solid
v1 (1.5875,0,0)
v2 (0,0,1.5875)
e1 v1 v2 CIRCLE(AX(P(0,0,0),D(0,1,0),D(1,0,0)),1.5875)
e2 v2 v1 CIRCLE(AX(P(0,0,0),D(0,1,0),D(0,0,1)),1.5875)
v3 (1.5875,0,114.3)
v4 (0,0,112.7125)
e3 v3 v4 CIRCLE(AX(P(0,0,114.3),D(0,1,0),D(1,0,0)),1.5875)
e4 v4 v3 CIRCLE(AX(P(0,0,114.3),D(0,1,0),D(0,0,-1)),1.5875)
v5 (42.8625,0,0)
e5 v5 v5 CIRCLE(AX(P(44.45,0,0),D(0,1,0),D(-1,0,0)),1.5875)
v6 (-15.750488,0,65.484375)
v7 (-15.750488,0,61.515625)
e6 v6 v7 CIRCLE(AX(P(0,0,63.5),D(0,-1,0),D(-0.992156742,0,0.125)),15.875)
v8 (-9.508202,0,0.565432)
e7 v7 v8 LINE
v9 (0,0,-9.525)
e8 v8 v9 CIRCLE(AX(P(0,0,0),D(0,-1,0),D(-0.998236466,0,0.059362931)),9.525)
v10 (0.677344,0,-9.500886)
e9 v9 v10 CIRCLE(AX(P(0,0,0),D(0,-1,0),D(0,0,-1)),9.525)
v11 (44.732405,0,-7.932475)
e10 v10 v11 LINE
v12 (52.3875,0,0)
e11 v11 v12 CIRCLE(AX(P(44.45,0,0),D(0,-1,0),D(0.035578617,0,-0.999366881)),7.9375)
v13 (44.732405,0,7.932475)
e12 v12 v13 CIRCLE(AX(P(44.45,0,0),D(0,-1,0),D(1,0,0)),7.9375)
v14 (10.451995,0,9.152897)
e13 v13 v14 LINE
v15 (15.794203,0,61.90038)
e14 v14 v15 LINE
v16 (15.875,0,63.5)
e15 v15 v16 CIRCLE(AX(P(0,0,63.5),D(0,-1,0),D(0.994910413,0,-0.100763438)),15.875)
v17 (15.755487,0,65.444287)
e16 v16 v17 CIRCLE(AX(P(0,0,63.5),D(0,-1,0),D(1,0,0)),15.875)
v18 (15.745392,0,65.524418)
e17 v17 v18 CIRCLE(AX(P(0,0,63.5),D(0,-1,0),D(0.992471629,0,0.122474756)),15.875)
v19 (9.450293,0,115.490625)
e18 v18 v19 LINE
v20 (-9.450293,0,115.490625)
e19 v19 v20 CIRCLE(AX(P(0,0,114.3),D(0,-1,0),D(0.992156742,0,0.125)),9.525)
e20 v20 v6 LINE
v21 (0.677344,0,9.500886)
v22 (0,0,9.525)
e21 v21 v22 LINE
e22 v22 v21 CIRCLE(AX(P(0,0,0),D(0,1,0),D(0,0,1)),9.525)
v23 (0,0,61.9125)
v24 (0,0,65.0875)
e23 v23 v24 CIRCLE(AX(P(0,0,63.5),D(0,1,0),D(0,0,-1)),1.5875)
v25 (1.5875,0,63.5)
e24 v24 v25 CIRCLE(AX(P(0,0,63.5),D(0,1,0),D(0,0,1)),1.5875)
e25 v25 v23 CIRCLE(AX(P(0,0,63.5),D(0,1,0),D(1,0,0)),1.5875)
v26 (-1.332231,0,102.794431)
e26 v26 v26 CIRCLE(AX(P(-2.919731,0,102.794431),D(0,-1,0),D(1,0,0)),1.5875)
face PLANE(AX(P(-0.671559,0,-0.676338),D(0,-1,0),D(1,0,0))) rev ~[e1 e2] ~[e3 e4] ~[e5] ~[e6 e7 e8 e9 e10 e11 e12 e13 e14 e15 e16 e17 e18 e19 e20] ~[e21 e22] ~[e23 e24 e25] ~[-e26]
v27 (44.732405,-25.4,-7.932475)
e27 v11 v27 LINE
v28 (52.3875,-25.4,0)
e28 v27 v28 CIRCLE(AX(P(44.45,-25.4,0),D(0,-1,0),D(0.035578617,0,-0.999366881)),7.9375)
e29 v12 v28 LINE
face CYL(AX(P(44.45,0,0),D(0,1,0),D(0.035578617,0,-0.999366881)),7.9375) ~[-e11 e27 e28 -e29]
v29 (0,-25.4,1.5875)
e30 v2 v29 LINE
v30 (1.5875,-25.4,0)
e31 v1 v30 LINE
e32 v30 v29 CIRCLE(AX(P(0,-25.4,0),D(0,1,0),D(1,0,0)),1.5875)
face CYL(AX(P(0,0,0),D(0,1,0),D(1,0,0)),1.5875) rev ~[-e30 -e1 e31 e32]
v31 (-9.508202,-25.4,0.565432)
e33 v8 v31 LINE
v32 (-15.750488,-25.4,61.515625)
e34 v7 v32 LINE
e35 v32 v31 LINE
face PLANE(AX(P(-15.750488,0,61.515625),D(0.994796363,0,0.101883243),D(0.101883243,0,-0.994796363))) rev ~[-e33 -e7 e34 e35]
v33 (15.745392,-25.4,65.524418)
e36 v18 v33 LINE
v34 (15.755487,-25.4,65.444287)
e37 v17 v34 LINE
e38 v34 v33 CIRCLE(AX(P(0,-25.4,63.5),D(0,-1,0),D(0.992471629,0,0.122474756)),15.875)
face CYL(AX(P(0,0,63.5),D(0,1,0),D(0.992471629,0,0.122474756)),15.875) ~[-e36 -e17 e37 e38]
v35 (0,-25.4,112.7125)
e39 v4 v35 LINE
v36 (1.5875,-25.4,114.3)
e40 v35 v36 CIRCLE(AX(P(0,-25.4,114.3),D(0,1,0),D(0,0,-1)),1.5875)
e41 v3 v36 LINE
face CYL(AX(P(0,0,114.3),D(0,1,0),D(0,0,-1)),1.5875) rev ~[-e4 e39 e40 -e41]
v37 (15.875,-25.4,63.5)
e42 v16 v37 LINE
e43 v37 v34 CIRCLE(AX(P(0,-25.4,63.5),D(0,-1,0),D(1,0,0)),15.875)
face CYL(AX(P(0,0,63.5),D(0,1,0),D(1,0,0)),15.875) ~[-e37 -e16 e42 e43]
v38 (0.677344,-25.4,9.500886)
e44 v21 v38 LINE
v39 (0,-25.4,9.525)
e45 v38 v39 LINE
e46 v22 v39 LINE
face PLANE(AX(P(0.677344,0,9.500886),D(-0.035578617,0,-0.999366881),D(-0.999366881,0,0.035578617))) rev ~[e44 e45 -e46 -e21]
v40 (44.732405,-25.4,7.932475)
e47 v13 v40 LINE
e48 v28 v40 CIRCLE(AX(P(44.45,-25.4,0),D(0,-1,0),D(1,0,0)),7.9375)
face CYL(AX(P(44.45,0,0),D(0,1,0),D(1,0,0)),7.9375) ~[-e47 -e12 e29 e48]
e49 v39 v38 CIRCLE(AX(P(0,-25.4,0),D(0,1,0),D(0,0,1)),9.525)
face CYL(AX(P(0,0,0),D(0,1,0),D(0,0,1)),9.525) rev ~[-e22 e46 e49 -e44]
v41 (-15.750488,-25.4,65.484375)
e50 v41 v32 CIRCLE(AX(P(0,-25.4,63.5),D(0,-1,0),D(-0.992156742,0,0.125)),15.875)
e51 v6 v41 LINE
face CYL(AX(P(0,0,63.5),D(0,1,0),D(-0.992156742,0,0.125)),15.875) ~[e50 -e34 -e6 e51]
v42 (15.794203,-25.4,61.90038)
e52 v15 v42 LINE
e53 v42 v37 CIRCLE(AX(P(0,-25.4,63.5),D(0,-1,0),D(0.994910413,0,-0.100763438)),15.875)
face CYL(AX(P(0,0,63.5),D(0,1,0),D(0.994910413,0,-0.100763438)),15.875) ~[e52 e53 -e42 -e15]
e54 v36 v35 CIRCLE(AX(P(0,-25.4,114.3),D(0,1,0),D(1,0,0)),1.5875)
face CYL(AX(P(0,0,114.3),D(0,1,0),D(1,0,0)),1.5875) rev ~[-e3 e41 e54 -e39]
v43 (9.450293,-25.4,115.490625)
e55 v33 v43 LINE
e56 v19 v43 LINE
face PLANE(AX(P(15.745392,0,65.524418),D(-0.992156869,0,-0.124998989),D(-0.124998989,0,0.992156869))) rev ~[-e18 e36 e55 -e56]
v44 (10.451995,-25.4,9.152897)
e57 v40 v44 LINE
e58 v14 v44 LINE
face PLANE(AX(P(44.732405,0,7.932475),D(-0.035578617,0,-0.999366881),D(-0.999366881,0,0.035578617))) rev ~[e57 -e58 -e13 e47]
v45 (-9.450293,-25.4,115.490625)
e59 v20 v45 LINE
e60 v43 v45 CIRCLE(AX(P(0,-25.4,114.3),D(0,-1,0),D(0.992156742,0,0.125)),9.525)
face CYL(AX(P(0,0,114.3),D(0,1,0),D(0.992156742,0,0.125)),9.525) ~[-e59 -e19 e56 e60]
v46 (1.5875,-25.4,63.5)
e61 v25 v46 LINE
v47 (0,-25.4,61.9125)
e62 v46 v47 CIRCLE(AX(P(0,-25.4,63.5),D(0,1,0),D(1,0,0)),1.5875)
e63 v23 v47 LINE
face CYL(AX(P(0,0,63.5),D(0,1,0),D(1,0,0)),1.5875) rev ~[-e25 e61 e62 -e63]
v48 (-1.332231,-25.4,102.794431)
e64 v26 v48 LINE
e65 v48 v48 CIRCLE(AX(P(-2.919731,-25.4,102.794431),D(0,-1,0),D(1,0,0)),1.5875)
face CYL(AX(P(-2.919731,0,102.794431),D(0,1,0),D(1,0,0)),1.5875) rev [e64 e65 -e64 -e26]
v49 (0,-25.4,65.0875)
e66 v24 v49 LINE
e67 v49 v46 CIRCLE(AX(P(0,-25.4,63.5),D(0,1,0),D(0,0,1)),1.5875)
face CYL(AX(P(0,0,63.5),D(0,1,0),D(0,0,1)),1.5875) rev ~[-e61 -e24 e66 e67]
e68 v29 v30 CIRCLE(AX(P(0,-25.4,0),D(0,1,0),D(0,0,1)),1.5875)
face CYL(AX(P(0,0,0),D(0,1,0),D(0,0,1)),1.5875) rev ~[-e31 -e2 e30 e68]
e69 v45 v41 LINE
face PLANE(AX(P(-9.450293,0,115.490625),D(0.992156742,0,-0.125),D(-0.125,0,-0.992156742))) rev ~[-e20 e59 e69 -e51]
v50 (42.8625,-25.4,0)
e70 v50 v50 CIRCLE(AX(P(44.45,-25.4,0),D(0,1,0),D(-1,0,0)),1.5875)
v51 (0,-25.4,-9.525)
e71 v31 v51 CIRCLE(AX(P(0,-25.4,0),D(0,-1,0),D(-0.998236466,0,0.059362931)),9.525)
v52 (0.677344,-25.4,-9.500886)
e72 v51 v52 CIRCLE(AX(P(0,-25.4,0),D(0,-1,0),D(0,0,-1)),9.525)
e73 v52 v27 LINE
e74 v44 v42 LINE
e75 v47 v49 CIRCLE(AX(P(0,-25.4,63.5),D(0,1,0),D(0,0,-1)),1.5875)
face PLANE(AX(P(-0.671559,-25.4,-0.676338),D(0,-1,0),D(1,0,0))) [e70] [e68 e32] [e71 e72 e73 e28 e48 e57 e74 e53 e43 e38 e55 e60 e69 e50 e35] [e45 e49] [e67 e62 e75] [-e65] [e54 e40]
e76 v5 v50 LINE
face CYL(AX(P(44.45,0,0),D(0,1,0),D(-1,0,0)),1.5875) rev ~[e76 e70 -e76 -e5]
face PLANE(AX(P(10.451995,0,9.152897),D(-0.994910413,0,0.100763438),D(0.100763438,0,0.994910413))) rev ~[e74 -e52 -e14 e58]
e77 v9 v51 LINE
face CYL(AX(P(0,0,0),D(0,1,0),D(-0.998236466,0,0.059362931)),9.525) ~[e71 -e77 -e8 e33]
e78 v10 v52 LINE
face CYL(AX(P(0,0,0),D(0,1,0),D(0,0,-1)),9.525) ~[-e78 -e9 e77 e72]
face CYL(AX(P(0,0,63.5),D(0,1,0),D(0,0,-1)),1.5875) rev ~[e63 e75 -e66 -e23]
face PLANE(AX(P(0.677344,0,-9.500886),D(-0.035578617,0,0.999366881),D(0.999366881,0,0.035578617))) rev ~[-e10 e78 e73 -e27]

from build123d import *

# Parameters (mm, degrees)
F0_R     = 1.5875
F1_DEPTH = 25.4


# Not quite as in the source:
# - ends of sketch curves that miss each other by under 0.0002 mm in the source are joined


with BuildPart() as f1:
    # F0 (on Front) → F1 (new body)
    with BuildSketch(Plane.XZ):
        with BuildLine():
            ThreePointArc((1.5875, 0), (-1.1225320151, -1.1225320151), (0, 1.5875))
            Line((0, 1.5875), (0, 9.525))
            ThreePointArc((0, 9.525), (-6.5322234356, 6.9322205668), (-9.5082023407, 0.5654319132))
            ThreePointArc((-9.5082023407, 0.5654319132), (-6.9322205668, -6.5322234356), (0, -9.525))
            Line((0, -9.525), (0.6773435479, -9.500885786))
            ThreePointArc((0.6773435479, -9.500885786), (6.9705567315, -6.4912990883), (9.525, 0))
            Line((9.525, 0), (1.5875, 0))
        make_face()
        with BuildLine():
            ThreePointArc((-9.5082023407, 0.5654319132), (-6.5322234356, 6.9322205668), (0, 9.525))
            Line((0, 9.525), (0, 47.625))
            ThreePointArc((0, 47.625), (-10.5003255158, 51.59375), (-15.7504882737, 61.515625))
            Line((-15.7504882737, 61.515625), (-9.5082023407, 0.5654319132))
        make_face()
        with BuildLine():
            Line((0, 47.625), (0, 9.525))
            ThreePointArc((0, 9.525), (0.3388863295, 9.5189695375), (0.6773435479, 9.500885786))
            Line((0.6773435479, 9.500885786), (10.4519953809, 9.152896871))
            Line((10.4519953809, 9.152896871), (15.7942028036, 61.9003804205))
            ThreePointArc((15.7942028036, 61.9003804205), (10.644756084, 51.722700101), (0, 47.625))
        make_face()
        with BuildLine():
            Line((10.4519953809, 9.152896871), (9.525, 0))
            Line((9.525, 0), (36.5125, 0))
            ThreePointArc((36.5125, 0), (38.9380895153, 5.7116327839), (44.7324052746, 7.9324746146))
            Line((44.7324052746, 7.9324746146), (10.4519953809, 9.152896871))
        make_face()
        with BuildLine():
            Line((36.5125, 0), (9.525, 0))
            ThreePointArc((9.525, 0), (6.9705567315, -6.4912990883), (0.6773435479, -9.500885786))
            Line((0.6773435479, -9.500885786), (44.7324052746, -7.9324746146))
            ThreePointArc((44.7324052746, -7.9324746146), (38.9380895153, -5.7116327839), (36.5125, 0))
        make_face()
        with BuildLine():
            ThreePointArc((0.6773435479, 9.500885786), (6.9705567315, 6.4912990883), (9.525, 0))
            Line((9.525, 0), (10.4519953809, 9.152896871))
            Line((10.4519953809, 9.152896871), (0.6773435479, 9.500885786))
        make_face()
        with BuildLine():
            ThreePointArc((-15.7504882737, 61.515625), (-10.5003255158, 51.59375), (0, 47.625))
            Line((0, 47.625), (0, 61.9125))
            ThreePointArc((0, 61.9125), (-1.5875, 63.5), (0, 65.0875))
            Line((0, 65.0875), (0, 79.375))
            ThreePointArc((0, 79.375), (-10.5003255158, 75.40625), (-15.7504882737, 65.484375))
            ThreePointArc((-15.7504882737, 65.484375), (-15.875, 63.5), (-15.7504882737, 61.515625))
        make_face()
        with BuildLine():
            ThreePointArc((0, 79.375), (10.5154665352, 75.3928797415), (15.7554871092, 65.444286746))
            Line((15.7554871092, 65.444286746), (9.4502929642, 115.490625))
            ThreePointArc((9.4502929642, 115.490625), (9.5063048942, 114.896483242), (9.525, 114.3))
            ThreePointArc((9.525, 114.3), (6.7351920908, 107.5648079092), (0, 104.775))
            Line((0, 104.775), (0, 79.375))
        make_face()
        with BuildLine():
            Line((0, 61.9125), (0, 47.625))
            ThreePointArc((0, 47.625), (10.644756084, 51.722700101), (15.7942028036, 61.9003804205))
            ThreePointArc((15.7942028036, 61.9003804205), (15.8547878338, 62.6991705884), (15.875, 63.5))
            ThreePointArc((15.875, 63.5), (15.8450936075, 64.4739782187), (15.7554871092, 65.444286746))
            ThreePointArc((15.7554871092, 65.444286746), (10.5154665352, 75.3928797415), (0, 79.375))
            Line((0, 79.375), (0, 65.0875))
            ThreePointArc((0, 65.0875), (1.1225320151, 64.6225320151), (1.5875, 63.5))
            ThreePointArc((1.5875, 63.5), (1.1225320151, 62.3774679849), (0, 61.9125))
        make_face()
        with BuildLine():
            ThreePointArc((44.7324052746, 7.9324746146), (38.9380895153, 5.7116327839), (36.5125, 0))
            ThreePointArc((36.5125, 0), (38.9380895153, -5.7116327839), (44.7324052746, -7.9324746146))
            ThreePointArc((44.7324052746, -7.9324746146), (50.1616327839, -5.5119104847), (52.3875, 0))
            ThreePointArc((52.3875, 0), (50.1616327839, 5.5119104847), (44.7324052746, 7.9324746146))
        make_face()
        with BuildLine():
            ThreePointArc((46.0375, 0), (44.45, -1.5875), (42.8625, 0))
            ThreePointArc((42.8625, 0), (44.45, 1.5875), (46.0375, 0))
        make_face(mode=Mode.SUBTRACT)
        with BuildLine():
            ThreePointArc((0, -9.525), (0.3388863295, -9.5189695375), (0.6773435479, -9.500885786))
            Line((0.6773435479, -9.500885786), (0, -9.525))
        make_face()
        with BuildLine():
            Line((-9.4502929642, 115.490625), (-15.7504882737, 65.484375))
            ThreePointArc((-15.7504882737, 65.484375), (-10.5003255158, 75.40625), (0, 79.375))
            Line((0, 79.375), (0, 104.775))
            ThreePointArc((0, 104.775), (-7.14375, 107.9998046905), (-9.4502929642, 115.490625))
        make_face()
        with Locations((-2.919731196, 102.79443115)):
            Circle(F0_R, mode=Mode.SUBTRACT)
        with BuildLine():
            ThreePointArc((9.4502929642, 115.490625), (0, 123.825), (-9.4502929642, 115.490625))
            ThreePointArc((-9.4502929642, 115.490625), (-7.14375, 107.9998046905), (0, 104.775))
            ThreePointArc((0, 104.775), (6.7351920908, 107.5648079092), (9.525, 114.3))
            ThreePointArc((9.525, 114.3), (9.5063048942, 114.896483242), (9.4502929642, 115.490625))
        make_face()
        with BuildLine():
            ThreePointArc((1.5875, 114.3), (1.1225320151, 113.1774679849), (0, 112.7125))
            ThreePointArc((0, 112.7125), (-1.1225320151, 115.4225320151), (1.5875, 114.3))
        make_face(mode=Mode.SUBTRACT)
        with BuildLine():
            Line((0, 9.525), (0, 1.5875))
            ThreePointArc((0, 1.5875), (1.1225320151, 1.1225320151), (1.5875, 0))
            Line((1.5875, 0), (9.525, 0))
            ThreePointArc((9.525, 0), (6.9705567315, 6.4912990883), (0.6773435479, 9.500885786))
            Line((0.6773435479, 9.500885786), (0, 9.525))
        make_face()
    extrude(amount=F1_DEPTH)


solid = f1.part
